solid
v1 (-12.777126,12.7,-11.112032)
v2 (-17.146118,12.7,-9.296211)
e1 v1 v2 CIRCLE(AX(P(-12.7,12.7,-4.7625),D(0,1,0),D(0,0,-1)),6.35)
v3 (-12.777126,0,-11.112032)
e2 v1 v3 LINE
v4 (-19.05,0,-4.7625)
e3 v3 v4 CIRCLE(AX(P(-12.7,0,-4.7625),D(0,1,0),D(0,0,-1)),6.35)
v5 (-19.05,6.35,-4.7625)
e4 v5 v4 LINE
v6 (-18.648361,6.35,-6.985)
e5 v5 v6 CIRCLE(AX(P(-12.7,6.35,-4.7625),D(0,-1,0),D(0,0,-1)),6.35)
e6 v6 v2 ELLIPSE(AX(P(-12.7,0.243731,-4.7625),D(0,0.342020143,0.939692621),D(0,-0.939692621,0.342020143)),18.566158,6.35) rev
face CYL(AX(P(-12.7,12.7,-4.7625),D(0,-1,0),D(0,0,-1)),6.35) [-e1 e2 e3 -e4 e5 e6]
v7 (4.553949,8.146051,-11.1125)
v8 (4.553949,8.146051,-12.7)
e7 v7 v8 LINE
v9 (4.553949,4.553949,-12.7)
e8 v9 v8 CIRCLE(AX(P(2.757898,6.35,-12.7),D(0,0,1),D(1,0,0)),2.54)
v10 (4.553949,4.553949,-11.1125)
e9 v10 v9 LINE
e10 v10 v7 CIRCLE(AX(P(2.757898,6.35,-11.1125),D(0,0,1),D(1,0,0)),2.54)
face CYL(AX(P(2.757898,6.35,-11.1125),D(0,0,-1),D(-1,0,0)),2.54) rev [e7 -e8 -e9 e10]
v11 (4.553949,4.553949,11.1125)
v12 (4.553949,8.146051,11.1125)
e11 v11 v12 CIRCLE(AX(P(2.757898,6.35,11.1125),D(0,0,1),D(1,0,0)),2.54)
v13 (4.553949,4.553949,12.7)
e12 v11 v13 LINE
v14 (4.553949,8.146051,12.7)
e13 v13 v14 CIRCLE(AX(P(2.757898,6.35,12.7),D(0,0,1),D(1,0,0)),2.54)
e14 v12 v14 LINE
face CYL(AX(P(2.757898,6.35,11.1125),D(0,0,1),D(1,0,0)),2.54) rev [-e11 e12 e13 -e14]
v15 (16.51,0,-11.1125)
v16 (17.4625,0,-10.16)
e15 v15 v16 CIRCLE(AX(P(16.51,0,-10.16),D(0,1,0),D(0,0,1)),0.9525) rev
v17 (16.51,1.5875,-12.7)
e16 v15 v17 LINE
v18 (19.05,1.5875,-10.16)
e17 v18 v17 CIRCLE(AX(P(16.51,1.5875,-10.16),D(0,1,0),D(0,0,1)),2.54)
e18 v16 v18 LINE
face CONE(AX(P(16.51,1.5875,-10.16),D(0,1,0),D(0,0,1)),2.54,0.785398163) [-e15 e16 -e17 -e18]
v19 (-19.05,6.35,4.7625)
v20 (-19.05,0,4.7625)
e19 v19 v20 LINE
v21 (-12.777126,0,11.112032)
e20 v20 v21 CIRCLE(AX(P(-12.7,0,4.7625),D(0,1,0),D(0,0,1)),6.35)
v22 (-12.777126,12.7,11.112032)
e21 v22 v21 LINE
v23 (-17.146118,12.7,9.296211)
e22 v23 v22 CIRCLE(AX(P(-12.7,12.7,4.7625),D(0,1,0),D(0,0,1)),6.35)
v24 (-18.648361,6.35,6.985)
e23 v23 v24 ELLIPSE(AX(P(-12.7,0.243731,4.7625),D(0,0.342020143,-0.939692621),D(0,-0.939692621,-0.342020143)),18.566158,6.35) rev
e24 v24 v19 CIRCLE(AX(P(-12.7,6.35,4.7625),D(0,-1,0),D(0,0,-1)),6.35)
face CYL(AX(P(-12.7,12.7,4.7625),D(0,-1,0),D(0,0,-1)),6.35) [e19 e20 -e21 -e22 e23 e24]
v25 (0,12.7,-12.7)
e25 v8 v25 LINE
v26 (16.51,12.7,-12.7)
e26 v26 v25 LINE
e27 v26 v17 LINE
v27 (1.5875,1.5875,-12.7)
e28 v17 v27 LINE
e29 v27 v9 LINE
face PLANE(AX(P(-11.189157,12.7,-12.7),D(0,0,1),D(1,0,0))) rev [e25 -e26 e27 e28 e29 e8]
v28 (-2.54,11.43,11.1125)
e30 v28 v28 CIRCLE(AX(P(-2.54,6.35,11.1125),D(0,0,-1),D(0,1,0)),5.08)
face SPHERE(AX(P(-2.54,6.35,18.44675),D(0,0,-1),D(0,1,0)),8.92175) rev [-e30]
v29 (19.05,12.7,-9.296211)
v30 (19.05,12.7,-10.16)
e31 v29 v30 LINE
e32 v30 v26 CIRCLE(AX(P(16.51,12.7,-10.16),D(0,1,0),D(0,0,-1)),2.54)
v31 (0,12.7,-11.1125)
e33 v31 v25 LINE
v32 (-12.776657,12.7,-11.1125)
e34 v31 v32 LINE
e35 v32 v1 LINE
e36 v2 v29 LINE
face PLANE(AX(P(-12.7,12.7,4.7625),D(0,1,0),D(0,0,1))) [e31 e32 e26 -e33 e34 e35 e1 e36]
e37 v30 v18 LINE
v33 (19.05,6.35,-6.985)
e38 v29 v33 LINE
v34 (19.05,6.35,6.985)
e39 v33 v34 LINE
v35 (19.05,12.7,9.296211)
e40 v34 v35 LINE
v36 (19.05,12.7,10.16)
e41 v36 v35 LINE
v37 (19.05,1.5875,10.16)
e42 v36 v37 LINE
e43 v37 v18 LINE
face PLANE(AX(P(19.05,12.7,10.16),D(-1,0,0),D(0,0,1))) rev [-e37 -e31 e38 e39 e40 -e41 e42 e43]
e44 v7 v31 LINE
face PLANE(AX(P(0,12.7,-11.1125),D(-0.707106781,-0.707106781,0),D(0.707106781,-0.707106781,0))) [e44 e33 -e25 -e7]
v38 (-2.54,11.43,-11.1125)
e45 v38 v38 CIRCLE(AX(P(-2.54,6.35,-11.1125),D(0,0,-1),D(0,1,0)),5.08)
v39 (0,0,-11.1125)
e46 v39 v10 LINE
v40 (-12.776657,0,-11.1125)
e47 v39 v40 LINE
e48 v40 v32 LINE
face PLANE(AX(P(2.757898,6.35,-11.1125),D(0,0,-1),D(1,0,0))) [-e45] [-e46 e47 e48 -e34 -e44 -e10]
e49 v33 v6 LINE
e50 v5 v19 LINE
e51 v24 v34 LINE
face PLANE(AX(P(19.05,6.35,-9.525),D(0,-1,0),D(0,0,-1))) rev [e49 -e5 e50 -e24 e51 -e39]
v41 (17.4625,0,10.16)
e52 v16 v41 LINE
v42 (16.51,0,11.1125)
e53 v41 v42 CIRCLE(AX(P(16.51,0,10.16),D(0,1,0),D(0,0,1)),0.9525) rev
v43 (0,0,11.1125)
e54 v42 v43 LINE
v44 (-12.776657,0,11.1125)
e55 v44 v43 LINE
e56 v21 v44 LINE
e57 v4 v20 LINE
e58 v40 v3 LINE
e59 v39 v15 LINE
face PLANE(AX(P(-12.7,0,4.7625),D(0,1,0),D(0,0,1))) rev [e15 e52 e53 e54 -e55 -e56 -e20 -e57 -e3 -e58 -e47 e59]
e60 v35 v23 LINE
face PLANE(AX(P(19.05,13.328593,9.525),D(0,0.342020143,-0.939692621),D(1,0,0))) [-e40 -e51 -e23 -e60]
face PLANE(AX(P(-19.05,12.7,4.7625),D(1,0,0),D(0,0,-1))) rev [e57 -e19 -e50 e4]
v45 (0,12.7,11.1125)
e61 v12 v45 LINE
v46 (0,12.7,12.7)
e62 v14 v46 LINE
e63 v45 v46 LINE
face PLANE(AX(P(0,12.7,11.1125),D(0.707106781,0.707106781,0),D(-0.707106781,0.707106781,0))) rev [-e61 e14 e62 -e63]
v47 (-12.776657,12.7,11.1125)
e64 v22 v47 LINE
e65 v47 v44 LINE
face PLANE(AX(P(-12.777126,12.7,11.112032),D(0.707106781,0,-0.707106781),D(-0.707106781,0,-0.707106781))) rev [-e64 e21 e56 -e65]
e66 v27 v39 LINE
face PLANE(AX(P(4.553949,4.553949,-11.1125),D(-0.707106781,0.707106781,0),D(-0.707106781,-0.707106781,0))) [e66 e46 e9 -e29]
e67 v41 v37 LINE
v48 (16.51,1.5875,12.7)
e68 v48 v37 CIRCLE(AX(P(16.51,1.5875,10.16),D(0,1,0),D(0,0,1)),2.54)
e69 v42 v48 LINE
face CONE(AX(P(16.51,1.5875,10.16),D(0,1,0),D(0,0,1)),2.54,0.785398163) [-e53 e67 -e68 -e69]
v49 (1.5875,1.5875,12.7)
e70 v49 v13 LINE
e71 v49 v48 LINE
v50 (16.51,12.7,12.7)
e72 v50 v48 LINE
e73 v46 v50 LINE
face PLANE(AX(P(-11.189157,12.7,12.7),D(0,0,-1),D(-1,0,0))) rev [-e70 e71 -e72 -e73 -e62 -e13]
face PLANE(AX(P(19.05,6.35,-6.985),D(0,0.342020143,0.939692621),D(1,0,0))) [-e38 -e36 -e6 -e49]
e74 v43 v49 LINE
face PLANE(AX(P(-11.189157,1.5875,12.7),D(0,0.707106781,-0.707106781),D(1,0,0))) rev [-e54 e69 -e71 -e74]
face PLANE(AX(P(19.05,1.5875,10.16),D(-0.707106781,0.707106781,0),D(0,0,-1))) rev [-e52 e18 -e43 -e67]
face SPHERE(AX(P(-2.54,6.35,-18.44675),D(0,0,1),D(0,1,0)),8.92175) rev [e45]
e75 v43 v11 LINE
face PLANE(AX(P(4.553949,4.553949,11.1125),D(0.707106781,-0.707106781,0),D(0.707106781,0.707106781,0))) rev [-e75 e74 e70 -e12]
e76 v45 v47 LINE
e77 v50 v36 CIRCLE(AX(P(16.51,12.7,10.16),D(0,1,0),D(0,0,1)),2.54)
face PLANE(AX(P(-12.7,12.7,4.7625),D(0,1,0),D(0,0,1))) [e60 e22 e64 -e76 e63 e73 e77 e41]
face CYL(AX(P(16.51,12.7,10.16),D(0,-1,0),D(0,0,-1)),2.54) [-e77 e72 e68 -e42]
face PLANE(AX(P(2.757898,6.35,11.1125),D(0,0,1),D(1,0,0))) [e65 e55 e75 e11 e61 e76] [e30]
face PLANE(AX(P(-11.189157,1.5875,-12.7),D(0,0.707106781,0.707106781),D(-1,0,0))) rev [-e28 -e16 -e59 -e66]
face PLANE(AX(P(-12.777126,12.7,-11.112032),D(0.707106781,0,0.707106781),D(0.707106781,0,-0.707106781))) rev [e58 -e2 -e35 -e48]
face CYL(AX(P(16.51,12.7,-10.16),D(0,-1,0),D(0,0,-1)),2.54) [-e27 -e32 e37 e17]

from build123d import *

# Parameters (mm, degrees)
BOSS_EXTRUDE1_DEPTH = 12.7
SKETCH2_W           = 19.05
SKETCH2_H           = 6.35
CUT_EXTRUDE1_DEPTH  = 43.121134838
CHAMFER1_START      = -18.648360593
CHAMFER1_DEPTH      = 37.698360593
CHAMFER1_START_2    = 6.35
CHAMFER1_2_DEPTH    = 7.65
CUT_EXTRUDE3_DEPTH  = 1.5875
CHAMFER3_SIZE       = 1.5875


with BuildPart() as part:
    # Sketch1 → Boss-Extrude1 (new body)
    with BuildSketch(Plane(origin=(0, 0, 0), x_dir=(1, 0, 0), z_dir=(0, 1, 0))):
        with BuildLine():
            Line((-11.189157294, -12.7), (16.51, -12.7))
            ThreePointArc((16.51, -12.7), (18.306051224, -11.956051224), (19.05, -10.16))
            Line((19.05, -10.16), (19.05, 10.16))
            ThreePointArc((19.05, 10.16), (18.306051224, 11.956051224), (16.51, 12.7))
            Line((16.51, 12.7), (-11.189157294, 12.7))
            Line((-11.189157294, 12.7), (-12.777125687, 11.112031607))
            ThreePointArc((-12.777125687, 11.112031607), (-17.21731381, 9.225276708), (-19.05, 4.7625))
            Line((-19.05, 4.7625), (-19.05, -4.7625))
            ThreePointArc((-19.05, -4.7625), (-17.21731381, -9.225276708), (-12.777125687, -11.112031607))
            Line((-12.777125687, -11.112031607), (-11.189157294, -12.7))
        make_face()
    extrude(amount=BOSS_EXTRUDE1_DEPTH)

    # Sketch2 → Cut-Extrude1 (cut, through all)
    with BuildSketch(Plane.ZY.offset(19.05)):
        with Locations((0, 9.525)):
            Rectangle(SKETCH2_W, SKETCH2_H)
    extrude(amount=-CUT_EXTRUDE1_DEPTH, mode=Mode.SUBTRACT)

    # Chamfer1: read off the stored shape, not the designer's step
    # Chamfer1 outline → Chamfer1 (add)
    with BuildSketch(Plane.YZ.offset(CHAMFER1_START)):
        Polygon((6.35, 9.525), (6.35, 6.985), (12.7, 9.296210988), (12.7, 9.525), align=None)
        Polygon((12.7, -9.296210988), (6.35, -6.985), (6.35, -9.525), (12.7, -9.525), align=None)
    extrude(amount=CHAMFER1_DEPTH)

    # Chamfer1 2 outline → Chamfer1 2 (cut)
    with BuildSketch(Plane(origin=(0, 0, 0), x_dir=(1, 0, 0), z_dir=(0, 1, 0)).offset(CHAMFER1_START_2)):
        with BuildLine():
            Line((-18.648360593, -9.525), (-16.900130206, -9.525))
            ThreePointArc((-16.900130206, -9.525), (-17.930761549, -8.362726885), (-18.648360594, -6.985))
            Line((-18.648360594, -6.985), (-18.648360593, -9.525))
        make_face()
        with BuildLine():
            Line((-18.648360593, 9.525), (-18.648360594, 6.985))
            ThreePointArc((-18.648360594, 6.985), (-17.930761549, 8.362726885), (-16.900130206, 9.525))
            Line((-16.900130206, 9.525), (-18.648360593, 9.525))
        make_face()
    extrude(amount=CHAMFER1_2_DEPTH, mode=Mode.SUBTRACT)

    # Sketch4 → Cut-Extrude3 (cut)
    with BuildSketch(Plane.XY.offset(12.7)):
        with BuildLine():
            Line((-19.05, 0), (0, 0))
            Line((0, 0), (4.553948776, 4.553948776))
            ThreePointArc((4.553948776, 4.553948776), (5.297897552, 6.35), (4.553948776, 8.146051224))
            Line((4.553948776, 8.146051224), (0, 12.7))
            Line((0, 12.7), (-19.05, 12.7))
            Line((-19.05, 12.7), (-19.05, 0))
        make_face()
    cut_extrude3 = extrude(amount=-CUT_EXTRUDE3_DEPTH, mode=Mode.SUBTRACT)

    # Sketch6 → Cut-Revolve1 (revolve, cut)
    with BuildSketch(Plane.ZY.offset(2.54)):
        with BuildLine():
            Line((11.1125, 6.35), (11.1125, 11.43))
            ThreePointArc((11.1125, 11.43), (9.931118256, 9.01113492), (9.525, 6.35))
            Line((9.525, 6.35), (11.1125, 6.35))
        make_face()
    cut_revolve1 = revolve(axis=Axis((-2.54, 6.35, 0), (0, 0, 1)), mode=Mode.SUBTRACT)

    # Mirror1: Cut-Extrude3, Cut-Revolve1 across plane
    add(cut_extrude3.mirror(Plane(origin=(0, 0, 0), x_dir=(1, 0, 0), z_dir=(0, 0, -1))), mode=Mode.SUBTRACT)
    add(cut_revolve1.mirror(Plane(origin=(0, 0, 0), x_dir=(1, 0, 0), z_dir=(0, 0, -1))), mode=Mode.SUBTRACT)

    # Chamfer3
    chamfer3_edges = [part.edges().sort_by_distance(p)[0] for p in [
        (8.255, 0, 12.7),
        (18.306051224, 0, 11.956051224),
        (19.05, 0, 0),
        (18.306051224, 0, -11.956051224),
        (8.255, 0, -12.7),
    ]]
    chamfer(chamfer3_edges, length=CHAMFER3_SIZE)


solid = part.part
